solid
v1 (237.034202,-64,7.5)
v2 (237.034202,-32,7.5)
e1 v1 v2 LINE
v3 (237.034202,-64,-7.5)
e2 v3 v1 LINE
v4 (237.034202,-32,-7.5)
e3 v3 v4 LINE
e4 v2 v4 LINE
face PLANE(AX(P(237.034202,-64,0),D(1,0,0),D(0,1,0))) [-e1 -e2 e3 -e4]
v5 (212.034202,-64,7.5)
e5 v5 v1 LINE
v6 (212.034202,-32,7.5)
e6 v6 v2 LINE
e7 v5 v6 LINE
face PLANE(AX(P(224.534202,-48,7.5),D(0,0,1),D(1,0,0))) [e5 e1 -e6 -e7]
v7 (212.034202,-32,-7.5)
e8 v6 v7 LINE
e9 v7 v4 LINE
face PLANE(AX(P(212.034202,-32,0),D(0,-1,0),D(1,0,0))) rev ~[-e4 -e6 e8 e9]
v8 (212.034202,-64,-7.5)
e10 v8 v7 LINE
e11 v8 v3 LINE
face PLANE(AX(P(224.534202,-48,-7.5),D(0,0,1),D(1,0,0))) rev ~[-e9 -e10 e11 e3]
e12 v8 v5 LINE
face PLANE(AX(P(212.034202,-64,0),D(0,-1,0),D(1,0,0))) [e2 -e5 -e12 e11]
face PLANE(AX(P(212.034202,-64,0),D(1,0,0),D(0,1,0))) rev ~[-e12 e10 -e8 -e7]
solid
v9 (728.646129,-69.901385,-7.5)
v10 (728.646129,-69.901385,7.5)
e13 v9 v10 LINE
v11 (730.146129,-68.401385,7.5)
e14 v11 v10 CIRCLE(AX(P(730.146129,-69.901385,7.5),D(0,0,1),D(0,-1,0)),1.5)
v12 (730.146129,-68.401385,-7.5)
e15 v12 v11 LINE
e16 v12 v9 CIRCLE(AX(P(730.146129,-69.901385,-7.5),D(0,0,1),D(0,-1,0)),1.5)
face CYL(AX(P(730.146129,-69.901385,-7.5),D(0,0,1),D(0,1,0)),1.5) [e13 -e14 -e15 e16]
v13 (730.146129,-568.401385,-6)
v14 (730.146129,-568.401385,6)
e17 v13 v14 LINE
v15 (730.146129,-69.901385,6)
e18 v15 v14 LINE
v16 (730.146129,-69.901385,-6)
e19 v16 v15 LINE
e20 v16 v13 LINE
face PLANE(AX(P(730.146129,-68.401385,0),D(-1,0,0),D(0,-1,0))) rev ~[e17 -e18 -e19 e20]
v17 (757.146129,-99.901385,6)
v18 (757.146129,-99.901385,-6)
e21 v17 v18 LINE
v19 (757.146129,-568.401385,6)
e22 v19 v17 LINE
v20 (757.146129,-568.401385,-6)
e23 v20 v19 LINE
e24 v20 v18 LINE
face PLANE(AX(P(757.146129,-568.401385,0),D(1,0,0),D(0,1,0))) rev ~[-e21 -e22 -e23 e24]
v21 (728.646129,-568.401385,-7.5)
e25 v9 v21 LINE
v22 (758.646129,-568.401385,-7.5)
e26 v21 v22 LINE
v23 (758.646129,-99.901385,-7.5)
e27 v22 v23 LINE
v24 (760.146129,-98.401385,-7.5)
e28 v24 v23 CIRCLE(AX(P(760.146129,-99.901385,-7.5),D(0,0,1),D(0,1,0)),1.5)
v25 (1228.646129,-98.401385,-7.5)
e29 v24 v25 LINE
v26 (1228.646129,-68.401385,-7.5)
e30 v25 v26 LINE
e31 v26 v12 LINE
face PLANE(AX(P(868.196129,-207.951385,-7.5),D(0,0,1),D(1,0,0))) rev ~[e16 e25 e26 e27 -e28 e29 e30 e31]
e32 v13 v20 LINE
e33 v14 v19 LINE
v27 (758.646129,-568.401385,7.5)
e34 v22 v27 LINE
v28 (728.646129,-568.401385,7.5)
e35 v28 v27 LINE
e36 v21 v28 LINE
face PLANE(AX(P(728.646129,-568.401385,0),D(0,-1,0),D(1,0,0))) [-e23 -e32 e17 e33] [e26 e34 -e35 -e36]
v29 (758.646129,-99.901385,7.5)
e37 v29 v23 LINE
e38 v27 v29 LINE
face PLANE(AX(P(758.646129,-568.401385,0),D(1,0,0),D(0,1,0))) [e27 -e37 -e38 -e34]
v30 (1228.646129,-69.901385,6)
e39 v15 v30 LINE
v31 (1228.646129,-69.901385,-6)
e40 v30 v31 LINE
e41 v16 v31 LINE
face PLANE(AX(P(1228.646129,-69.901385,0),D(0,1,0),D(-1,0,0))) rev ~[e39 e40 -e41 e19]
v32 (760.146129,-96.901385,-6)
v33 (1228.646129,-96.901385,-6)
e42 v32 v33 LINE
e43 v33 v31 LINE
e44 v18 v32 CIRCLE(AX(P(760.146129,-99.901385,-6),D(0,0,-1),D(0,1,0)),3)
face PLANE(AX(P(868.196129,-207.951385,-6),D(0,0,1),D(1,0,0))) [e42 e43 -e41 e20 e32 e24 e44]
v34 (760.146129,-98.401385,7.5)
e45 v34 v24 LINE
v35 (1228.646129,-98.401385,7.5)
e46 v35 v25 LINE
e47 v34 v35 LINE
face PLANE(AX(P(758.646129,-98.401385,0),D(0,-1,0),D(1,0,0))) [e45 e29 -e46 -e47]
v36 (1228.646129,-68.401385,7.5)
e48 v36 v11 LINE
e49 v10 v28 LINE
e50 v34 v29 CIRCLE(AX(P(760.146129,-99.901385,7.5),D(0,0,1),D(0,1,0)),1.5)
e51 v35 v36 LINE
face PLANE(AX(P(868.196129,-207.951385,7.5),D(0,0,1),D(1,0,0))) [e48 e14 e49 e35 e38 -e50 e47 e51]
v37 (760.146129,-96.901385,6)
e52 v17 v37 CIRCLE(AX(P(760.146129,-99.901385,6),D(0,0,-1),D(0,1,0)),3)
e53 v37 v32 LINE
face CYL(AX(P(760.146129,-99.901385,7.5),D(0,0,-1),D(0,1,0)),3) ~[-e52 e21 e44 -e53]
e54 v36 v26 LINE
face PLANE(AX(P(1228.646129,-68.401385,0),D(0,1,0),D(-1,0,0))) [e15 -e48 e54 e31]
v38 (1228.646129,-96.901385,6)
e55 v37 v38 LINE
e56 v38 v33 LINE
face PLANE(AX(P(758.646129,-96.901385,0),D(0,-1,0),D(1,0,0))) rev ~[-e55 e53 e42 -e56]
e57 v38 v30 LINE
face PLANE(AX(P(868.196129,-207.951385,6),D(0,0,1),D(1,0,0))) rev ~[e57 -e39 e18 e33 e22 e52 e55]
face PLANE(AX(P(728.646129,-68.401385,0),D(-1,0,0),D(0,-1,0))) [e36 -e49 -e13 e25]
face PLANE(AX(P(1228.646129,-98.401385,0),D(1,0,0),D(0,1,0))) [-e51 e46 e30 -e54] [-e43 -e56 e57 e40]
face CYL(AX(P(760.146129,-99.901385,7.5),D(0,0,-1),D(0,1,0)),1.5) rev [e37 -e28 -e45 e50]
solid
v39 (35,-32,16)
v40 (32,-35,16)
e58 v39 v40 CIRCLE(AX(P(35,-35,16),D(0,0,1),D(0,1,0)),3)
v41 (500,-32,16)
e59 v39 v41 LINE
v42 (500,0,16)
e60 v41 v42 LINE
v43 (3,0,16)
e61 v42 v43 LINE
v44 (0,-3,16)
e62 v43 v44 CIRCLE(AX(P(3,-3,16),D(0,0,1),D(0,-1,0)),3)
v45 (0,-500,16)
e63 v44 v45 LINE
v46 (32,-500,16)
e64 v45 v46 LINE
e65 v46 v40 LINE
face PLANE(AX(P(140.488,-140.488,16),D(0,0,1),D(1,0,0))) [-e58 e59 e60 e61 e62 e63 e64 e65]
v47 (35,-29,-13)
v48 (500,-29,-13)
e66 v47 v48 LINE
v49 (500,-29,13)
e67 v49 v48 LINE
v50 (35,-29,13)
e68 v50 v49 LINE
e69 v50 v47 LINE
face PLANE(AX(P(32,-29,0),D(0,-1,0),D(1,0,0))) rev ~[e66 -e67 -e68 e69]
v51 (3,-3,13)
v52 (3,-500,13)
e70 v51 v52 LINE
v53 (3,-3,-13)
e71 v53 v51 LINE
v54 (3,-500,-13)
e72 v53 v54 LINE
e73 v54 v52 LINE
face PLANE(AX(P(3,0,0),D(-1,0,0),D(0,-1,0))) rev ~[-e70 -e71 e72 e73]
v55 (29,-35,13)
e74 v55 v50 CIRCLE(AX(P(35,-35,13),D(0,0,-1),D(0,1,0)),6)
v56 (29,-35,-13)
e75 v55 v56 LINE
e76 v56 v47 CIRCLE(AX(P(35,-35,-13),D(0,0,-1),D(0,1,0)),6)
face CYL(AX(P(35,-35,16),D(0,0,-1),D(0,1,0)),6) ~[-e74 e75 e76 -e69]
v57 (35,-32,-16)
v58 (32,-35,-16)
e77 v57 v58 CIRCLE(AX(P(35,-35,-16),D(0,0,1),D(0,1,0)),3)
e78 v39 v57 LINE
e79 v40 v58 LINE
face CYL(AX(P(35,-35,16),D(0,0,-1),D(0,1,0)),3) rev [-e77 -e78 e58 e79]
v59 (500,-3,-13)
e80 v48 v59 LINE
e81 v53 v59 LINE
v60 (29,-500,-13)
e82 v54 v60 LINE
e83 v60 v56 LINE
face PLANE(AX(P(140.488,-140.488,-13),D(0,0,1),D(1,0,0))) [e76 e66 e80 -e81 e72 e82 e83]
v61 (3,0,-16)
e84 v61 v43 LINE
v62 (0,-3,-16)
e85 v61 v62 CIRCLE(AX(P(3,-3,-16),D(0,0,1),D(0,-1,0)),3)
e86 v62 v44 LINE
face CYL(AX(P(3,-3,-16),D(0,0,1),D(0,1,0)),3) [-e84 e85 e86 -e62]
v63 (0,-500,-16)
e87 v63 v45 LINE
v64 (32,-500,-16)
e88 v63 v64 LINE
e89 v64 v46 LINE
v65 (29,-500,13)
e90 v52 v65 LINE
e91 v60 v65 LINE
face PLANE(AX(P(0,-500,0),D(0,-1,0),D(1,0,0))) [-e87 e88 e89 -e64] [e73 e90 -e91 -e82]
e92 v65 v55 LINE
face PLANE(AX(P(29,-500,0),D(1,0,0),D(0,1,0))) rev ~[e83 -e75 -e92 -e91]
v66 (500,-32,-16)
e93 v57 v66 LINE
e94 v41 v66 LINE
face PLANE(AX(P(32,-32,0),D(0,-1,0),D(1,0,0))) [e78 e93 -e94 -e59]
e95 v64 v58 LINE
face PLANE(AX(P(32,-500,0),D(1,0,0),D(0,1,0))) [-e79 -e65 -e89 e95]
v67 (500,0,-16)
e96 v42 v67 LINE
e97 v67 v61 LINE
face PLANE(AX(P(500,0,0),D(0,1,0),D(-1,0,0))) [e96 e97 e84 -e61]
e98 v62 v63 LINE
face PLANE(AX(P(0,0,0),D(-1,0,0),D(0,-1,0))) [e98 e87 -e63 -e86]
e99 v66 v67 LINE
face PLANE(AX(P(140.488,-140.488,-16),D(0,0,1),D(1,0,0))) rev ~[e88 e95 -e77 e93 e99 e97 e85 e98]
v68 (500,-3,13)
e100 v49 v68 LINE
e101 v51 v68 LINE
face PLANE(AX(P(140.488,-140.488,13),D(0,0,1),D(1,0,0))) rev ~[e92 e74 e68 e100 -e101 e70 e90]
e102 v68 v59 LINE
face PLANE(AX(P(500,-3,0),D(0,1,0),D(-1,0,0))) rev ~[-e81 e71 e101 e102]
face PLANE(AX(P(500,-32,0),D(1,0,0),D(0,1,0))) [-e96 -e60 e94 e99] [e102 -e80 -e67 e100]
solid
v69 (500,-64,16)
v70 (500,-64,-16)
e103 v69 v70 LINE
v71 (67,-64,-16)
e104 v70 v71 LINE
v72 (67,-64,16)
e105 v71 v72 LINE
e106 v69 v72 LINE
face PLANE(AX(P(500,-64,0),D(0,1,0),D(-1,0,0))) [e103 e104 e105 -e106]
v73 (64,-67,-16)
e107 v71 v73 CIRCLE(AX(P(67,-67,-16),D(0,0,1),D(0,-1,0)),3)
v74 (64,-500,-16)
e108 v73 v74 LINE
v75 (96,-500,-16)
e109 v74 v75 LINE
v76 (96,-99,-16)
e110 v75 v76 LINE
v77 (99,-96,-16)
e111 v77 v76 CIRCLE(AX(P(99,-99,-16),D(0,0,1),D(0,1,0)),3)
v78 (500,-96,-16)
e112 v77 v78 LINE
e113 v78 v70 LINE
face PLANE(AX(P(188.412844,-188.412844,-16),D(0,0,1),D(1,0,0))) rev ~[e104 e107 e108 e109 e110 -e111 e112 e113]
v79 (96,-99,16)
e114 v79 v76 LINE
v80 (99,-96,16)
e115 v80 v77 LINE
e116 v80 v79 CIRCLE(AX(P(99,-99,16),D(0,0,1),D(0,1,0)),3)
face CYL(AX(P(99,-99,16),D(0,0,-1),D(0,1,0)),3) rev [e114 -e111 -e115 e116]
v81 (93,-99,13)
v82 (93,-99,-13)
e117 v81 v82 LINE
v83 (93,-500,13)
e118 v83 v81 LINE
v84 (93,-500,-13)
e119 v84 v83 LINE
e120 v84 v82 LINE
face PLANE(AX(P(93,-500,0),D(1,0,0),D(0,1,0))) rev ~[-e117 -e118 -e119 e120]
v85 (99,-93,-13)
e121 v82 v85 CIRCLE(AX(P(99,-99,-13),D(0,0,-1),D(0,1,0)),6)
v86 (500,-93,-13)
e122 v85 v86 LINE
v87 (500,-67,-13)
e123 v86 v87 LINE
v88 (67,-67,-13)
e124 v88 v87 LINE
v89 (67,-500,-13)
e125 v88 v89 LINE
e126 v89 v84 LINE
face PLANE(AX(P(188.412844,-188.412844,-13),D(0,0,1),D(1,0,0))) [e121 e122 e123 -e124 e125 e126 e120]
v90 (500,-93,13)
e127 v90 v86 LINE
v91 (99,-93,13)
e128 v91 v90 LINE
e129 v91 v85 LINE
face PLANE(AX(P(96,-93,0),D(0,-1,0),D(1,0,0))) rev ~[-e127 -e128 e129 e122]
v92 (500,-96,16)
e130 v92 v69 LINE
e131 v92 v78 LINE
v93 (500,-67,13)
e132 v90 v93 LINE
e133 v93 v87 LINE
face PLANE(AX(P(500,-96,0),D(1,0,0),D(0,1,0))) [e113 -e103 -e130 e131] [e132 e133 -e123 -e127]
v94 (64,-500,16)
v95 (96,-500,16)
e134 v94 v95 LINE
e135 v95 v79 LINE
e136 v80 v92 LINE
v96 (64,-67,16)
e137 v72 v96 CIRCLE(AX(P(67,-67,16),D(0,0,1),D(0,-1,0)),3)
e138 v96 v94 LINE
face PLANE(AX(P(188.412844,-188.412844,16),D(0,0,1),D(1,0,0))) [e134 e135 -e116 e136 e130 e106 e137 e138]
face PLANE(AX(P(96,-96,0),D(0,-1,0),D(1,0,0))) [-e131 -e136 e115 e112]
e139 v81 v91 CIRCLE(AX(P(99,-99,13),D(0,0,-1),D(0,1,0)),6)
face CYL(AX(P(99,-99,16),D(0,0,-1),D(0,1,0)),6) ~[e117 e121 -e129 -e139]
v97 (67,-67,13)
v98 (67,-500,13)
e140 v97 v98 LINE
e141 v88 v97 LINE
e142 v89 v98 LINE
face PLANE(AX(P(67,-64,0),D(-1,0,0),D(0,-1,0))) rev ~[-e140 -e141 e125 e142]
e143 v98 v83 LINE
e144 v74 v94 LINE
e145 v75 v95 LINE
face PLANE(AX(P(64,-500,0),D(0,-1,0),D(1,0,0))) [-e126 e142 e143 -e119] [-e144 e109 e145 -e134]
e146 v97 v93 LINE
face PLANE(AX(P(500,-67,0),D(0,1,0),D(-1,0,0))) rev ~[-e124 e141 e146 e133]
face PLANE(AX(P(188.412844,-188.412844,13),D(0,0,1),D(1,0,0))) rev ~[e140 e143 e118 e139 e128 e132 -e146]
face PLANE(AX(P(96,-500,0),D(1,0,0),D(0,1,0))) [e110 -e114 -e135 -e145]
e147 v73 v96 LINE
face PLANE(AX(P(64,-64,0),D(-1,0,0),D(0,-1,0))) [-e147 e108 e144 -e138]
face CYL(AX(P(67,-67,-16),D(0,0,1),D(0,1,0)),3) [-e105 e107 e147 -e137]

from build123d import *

# Parameters (mm, degrees)
F1_DEPTH      = 16
F1_DEPTH_BACK = 16
F2_R          = 3
F2_2_R        = 3
F3_T          = 3
F3_2_T        = 3
F4_W          = 25
F4_H          = 32
F5_DEPTH      = 7.5
F5_DEPTH_BACK = 7.5
F7_DEPTH      = 7.5
F7_DEPTH_BACK = 7.5
F8_R          = 1.5
F9_T          = 1.5


# Not quite as in the source:
# - a shell that OpenCascade refuses in one call is made with other operations: the cavity is built on its own and cut out


with BuildPart() as f1:
    # F0 (on Top) → F1 (new body, two sides)
    with BuildSketch(Plane.XY) as f1_sk:
        Polygon((500, -64), (64, -64), (64, -500), (96, -500), (96, -96), (500, -96), align=None)
    extrude(amount=F1_DEPTH)
    extrude(f1_sk.sketch, amount=-F1_DEPTH_BACK)

    # F2
    f2_edges = [f1.edges().sort_by_distance(p)[0] for p in [
        (64, -64, 0),
        (96, -96, 0),
    ]]
    fillet(f2_edges, radius=F2_R)

    # F3#2: shell of thickness 3, made by hand


with BuildPart() as f1b:
    # F0 (on Top) → F1, piece 2 (new body, two sides)
    with BuildSketch(Plane.XY) as f1_2_sk:
        Polygon((500, 0), (0, 0), (0, -500), (32, -500), (32, -32), (500, -32), align=None)
    extrude(amount=F1_DEPTH)
    extrude(f1_2_sk.sketch, amount=-F1_DEPTH_BACK)

    # F2#2
    f2_2_edges = [f1b.edges().sort_by_distance(p)[0] for p in [
        (0, 0, 0),
        (32, -32, 0),
    ]]
    fillet(f2_2_edges, radius=F2_2_R)

    # F3: shell of thickness 3, made by hand


with BuildPart() as f3_core1:
    # F3_t2: copy of F1b
    add(f1b.part)

    # the walls: a layer under each face that stays
    f3_faces = [f3_core1.faces().sort_by_distance(p)[0] for p in [
        (251.5, 0, 0),
        (16.6666666667, -483.3333333333, 16),
        (16.6666666667, -483.3333333333, -16),
        (0, -251.5, 0),
        (267.5, -32, 0),
        (32.8786796564, -32.8786796564, 0),
        (32, -267.5, 0),
    ]]
    thicken(f3_faces, amount=-F3_T, mode=Mode.SUBTRACT)


with BuildPart() as f1b_1:
    add(f1b.part)

    # what is left inside the walls is the cavity
    f3_cavity = [f3_core1.part.solids().sort_by_distance(p)[0] for p in [
        (18.53125, -205.481481, -12.97),
    ]]
    add(f3_cavity, mode=Mode.SUBTRACT)


with BuildPart() as f3_2_core1:
    # F3_2_t2: copy of F1
    add(f1.part)

    # the walls: a layer under each face that stays
    f3_2_faces = [f3_2_core1.faces().sort_by_distance(p)[0] for p in [
        (283.5, -64, 0),
        (95.1428571429, -468.8571428571, 16),
        (95.1428571429, -468.8571428571, -16),
        (64, -283.5, 0),
        (299.5, -96, 0),
        (96.8786796564, -96.8786796564, 0),
        (96, -299.5, 0),
    ]]
    thicken(f3_2_faces, amount=-F3_2_T, mode=Mode.SUBTRACT)


with BuildPart() as f1_1:
    add(f1.part)

    # what is left inside the walls is the cavity
    f3_2_cavity = [f3_2_core1.part.solids().sort_by_distance(p)[0] for p in [
        (80.53125, -243.407407, -12.97),
    ]]
    add(f3_2_cavity, mode=Mode.SUBTRACT)


with BuildPart() as f5:
    # F4 (on Top) → F5 (new body, two sides)
    with BuildSketch(Plane.XY) as f5_sk:
        with Locations((224.534201622, -48)):
            Rectangle(F4_W, F4_H)
    extrude(amount=F5_DEPTH)
    extrude(f5_sk.sketch, amount=-F5_DEPTH_BACK)


with BuildPart() as f7:
    # F6 (on Top) → F7 (new body, two sides)
    with BuildSketch(Plane.XY) as f7_sk:
        Polygon((1228.6461293697, -68.4013846497), (728.6461293697, -68.4013846497), (728.6461293697, -568.4013846497), (758.6461293697, -568.4013846497), (758.6461293697, -98.4013846497), (1228.6461293697, -98.4013846497), align=None)
    extrude(amount=F7_DEPTH)
    extrude(f7_sk.sketch, amount=-F7_DEPTH_BACK)

    # F8
    f8_edges = [f7.edges().sort_by_distance(p)[0] for p in [
        (728.646129, -68.401385, 0),
        (758.646129, -98.401385, 0),
    ]]
    fillet(f8_edges, radius=F8_R)

    # F9: shell of thickness 1.5, made by hand


with BuildPart() as f9_core1:
    # F9_t2: copy of F7
    add(f7.part)

    # the walls: a layer under each face that stays
    f9_faces = [f9_core1.faces().sort_by_distance(p)[0] for p in [
        (979.3961293697, -68.4013846497, 0),
        (745.3127960364, -551.7347179831, 7.5),
        (745.3127960364, -551.7347179831, -7.5),
        (728.6461293697, -319.1513846497, 0),
        (994.3961293697, -98.4013846497, 0),
        (759.085469198, -98.840724478, 0),
        (758.6461293697, -334.1513846497, 0),
    ]]
    thicken(f9_faces, amount=-F9_T, mode=Mode.SUBTRACT)


with BuildPart() as f7_1:
    add(f7.part)

    # what is left inside the walls is the cavity
    f9_cavity = [f9_core1.part.solids().sort_by_distance(p)[0] for p in [
        (745.724254, -272.993977, -5.985),
    ]]
    add(f9_cavity, mode=Mode.SUBTRACT)


solid = Compound([f1b_1.part, f1_1.part, f5.part, f7_1.part])
